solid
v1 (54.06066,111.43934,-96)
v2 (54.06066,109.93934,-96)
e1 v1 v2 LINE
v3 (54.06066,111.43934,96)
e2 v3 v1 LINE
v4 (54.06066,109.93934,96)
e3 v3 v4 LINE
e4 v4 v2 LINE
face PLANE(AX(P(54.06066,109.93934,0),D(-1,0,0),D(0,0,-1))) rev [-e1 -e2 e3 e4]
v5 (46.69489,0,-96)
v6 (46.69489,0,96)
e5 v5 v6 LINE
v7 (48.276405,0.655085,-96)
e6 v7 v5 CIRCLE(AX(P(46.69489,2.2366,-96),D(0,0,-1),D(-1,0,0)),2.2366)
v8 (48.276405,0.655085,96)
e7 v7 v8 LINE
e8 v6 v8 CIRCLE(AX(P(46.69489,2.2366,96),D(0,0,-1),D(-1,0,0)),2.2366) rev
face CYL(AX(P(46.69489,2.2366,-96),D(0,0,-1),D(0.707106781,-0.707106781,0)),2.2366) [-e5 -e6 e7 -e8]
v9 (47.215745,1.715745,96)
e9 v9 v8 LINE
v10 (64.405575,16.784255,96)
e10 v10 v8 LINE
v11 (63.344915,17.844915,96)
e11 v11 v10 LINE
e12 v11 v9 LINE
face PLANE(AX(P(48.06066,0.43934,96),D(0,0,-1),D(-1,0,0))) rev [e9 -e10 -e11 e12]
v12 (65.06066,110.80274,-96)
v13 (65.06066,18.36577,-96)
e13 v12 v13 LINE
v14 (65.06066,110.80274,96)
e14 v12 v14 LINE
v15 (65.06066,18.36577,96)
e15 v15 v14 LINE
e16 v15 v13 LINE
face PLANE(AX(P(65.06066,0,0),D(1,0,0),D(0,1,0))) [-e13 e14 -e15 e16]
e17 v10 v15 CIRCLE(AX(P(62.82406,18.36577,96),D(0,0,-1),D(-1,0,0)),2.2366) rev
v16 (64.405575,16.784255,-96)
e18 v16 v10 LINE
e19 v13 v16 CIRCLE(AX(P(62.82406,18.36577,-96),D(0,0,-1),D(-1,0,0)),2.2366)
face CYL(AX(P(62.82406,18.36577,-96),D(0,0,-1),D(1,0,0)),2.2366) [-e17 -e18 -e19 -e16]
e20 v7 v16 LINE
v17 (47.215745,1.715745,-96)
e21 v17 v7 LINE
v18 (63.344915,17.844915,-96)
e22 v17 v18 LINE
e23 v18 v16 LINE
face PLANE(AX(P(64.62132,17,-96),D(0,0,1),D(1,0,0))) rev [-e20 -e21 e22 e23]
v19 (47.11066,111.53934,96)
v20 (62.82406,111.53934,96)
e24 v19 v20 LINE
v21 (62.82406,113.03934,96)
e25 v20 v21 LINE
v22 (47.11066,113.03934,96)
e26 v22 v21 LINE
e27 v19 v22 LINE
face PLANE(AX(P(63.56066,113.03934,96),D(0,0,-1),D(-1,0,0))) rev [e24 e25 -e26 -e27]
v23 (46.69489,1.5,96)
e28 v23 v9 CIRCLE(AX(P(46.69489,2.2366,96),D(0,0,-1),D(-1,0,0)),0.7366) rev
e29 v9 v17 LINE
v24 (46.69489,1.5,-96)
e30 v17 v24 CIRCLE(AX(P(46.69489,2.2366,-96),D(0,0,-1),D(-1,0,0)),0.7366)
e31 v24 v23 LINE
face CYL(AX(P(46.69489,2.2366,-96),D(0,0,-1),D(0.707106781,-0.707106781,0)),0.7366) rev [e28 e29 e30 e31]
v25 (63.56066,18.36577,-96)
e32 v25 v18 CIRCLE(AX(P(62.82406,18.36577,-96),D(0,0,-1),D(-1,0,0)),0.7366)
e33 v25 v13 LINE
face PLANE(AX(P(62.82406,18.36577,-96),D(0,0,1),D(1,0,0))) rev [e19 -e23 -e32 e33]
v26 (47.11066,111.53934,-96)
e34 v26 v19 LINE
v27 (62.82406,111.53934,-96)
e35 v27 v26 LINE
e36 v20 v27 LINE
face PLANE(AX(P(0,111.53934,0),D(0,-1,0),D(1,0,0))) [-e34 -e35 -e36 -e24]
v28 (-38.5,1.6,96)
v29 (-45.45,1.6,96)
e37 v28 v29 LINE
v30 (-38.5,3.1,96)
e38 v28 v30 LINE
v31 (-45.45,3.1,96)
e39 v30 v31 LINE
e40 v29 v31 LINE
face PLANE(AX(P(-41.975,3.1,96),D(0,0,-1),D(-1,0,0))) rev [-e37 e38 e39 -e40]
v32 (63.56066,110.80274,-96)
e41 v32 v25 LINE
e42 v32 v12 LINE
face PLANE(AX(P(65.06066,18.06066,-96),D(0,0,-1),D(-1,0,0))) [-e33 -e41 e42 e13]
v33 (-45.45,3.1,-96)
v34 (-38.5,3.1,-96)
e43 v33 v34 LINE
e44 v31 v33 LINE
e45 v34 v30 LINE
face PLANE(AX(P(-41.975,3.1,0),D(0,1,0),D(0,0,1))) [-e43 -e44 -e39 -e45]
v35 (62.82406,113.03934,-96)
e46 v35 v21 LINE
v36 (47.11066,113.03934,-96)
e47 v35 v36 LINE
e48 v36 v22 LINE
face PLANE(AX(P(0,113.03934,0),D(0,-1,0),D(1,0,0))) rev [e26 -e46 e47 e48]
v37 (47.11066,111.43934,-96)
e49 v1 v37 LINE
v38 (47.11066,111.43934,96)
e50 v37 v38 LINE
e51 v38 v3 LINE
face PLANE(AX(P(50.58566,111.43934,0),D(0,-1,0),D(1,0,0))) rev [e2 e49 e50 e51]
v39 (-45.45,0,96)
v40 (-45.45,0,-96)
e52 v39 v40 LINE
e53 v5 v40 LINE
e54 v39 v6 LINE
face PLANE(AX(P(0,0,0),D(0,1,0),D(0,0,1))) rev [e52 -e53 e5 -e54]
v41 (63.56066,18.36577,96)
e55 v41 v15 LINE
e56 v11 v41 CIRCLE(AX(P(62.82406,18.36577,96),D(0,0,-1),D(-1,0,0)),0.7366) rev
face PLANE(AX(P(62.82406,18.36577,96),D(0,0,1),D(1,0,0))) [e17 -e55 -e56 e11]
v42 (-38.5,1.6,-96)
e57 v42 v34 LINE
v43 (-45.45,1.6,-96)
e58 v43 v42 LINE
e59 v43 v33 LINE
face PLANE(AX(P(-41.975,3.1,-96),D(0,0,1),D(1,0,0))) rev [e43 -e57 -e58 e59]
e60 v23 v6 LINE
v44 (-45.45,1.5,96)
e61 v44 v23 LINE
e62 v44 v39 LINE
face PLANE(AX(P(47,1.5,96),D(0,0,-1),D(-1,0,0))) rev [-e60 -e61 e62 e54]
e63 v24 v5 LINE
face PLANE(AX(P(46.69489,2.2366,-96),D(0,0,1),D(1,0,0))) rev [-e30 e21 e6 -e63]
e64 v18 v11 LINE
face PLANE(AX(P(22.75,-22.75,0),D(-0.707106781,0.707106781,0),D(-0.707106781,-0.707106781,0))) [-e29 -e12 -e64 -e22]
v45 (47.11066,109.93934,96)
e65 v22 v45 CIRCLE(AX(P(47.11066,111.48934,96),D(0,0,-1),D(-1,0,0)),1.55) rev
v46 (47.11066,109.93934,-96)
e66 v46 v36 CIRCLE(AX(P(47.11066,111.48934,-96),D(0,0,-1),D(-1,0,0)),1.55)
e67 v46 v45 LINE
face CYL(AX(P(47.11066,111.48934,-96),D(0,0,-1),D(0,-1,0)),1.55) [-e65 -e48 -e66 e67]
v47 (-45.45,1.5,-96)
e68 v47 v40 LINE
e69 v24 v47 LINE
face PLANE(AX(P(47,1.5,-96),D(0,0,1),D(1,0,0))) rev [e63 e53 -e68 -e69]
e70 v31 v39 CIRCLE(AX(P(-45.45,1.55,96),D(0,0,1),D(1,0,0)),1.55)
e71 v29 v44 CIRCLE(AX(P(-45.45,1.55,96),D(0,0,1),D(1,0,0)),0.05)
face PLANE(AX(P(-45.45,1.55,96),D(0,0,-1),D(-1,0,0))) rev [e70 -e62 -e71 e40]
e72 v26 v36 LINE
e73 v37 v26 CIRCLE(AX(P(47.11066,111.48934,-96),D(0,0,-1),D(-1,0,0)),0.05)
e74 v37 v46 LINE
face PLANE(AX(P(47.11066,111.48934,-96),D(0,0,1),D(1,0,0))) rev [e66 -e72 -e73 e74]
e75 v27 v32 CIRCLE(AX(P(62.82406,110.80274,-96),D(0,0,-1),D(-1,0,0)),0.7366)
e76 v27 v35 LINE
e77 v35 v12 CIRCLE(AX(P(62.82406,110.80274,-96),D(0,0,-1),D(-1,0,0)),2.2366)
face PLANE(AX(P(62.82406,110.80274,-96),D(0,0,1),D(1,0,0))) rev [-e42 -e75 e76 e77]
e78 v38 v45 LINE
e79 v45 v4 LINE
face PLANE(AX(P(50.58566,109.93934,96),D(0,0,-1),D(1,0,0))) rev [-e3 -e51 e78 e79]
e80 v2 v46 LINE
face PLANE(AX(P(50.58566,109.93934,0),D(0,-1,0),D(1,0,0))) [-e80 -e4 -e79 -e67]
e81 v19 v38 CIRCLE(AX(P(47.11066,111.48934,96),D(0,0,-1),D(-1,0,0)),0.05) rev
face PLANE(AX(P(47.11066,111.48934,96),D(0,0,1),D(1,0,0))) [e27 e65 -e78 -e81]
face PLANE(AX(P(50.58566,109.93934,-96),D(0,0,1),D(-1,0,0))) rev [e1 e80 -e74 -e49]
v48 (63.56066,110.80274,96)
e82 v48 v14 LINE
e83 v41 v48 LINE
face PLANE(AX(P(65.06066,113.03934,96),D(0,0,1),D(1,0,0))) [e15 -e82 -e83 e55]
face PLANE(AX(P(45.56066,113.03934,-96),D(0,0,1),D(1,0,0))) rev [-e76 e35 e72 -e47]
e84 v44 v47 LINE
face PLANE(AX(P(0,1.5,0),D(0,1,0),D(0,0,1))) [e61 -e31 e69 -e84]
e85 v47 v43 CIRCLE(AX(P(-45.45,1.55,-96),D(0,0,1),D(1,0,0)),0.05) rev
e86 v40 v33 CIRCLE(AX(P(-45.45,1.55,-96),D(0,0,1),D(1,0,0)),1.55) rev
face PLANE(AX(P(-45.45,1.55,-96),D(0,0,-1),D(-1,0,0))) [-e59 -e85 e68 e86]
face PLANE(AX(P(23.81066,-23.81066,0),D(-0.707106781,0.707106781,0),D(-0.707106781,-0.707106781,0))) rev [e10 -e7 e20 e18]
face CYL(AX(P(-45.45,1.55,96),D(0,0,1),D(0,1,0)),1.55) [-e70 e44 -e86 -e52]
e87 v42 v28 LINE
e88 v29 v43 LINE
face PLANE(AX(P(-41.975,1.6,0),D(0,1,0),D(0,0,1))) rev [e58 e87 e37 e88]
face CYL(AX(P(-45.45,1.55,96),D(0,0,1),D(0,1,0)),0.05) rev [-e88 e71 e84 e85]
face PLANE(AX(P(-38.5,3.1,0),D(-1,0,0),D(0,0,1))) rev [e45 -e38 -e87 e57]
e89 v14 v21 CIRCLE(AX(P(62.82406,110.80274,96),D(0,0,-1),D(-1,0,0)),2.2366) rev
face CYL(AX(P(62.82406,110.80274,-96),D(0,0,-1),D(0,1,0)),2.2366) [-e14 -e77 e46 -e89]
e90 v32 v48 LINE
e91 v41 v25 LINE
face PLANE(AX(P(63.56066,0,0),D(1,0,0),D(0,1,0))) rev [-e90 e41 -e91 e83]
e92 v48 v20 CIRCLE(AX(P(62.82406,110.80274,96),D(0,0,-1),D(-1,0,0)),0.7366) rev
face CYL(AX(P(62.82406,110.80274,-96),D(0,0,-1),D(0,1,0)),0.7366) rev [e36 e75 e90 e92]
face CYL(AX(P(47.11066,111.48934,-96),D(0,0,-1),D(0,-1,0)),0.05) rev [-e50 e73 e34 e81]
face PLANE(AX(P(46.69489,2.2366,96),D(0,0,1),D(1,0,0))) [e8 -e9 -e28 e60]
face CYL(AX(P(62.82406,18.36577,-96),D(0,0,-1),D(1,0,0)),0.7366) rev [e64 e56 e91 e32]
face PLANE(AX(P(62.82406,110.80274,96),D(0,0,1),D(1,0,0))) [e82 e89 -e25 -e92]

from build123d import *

# Parameters (mm, degrees)
CROQUIS1_W                       = 94
CROQUIS1_H                       = 192
BRIDA_BASE1_DEPTH                = 1.5
BRIDA_DE_ARISTA1_STRIP_CUT_DEPTH = 192
BRIDA_DE_ARISTA1_DEPTH           = 192
BRIDA_DE_ARISTA3_STRIP_CUT_DEPTH = 192
BRIDA_DE_ARISTA3_DEPTH           = 192
BRIDA_DE_ARISTA4_STRIP_W         = 7.4732
BRIDA_DE_ARISTA4_STRIP_H         = 1.5
BRIDA_DE_ARISTA4_STRIP_CUT_DEPTH = 192
BRIDA_DE_ARISTA4_DEPTH           = 192
DOBLADILLO1_START                = -96
DOBLADILLO1_DEPTH                = 192
DOBLADILLO1_2_DEPTH              = 192


# Read off the part's stored shape, not the designer's step: Dobladillo1
# Sheet-metal steps are written as plain solids
with BuildPart() as part:
    # Croquis1 → Brida base1 (new body)
    with BuildSketch(Plane(origin=(0, 0, 0), x_dir=(1, 0, 0), z_dir=(0, 1, 0))):
        Rectangle(CROQUIS1_W, CROQUIS1_H)
    extrude(amount=BRIDA_BASE1_DEPTH)

    # Brida de arista1 strip (across the edge) → Brida de arista1 strip cut (cut)
    with BuildSketch(Plane(origin=(47, 1.5, 96), x_dir=(-0.7071067811865438, 0.7071067811865512, 0), z_dir=(0, 0, -1))):
        Polygon((-6.129265424, 4.00794508), (-0.844915027, -1.276405317), (0.215745145, -0.215745145), (-5.068605252, 5.068605252), align=None)
    extrude(amount=BRIDA_DE_ARISTA1_STRIP_CUT_DEPTH, mode=Mode.SUBTRACT)

    # Brida de arista1 section (across the edge) → Brida de arista1 (add)
    with BuildSketch(Plane(origin=(47, 1.5, 96), x_dir=(-0.7071067811865438, 0.7071067811865512, 0), z_dir=(0, 0, -1))):
        with BuildLine():
            Line((-1.5, 0.30510971), (-1.5, 23.420310217))
            Line((-1.5, 23.420310217), (0, 23.420310217))
            Line((0, 23.420310217), (0, 0.30510971))
            ThreePointArc((0, 0.30510971), (0.056070336, 0.023225094), (0.215745145, -0.215745145))
            Line((0.215745145, -0.215745145), (-0.844915027, -1.276405317))
            ThreePointArc((-0.844915027, -1.276405317), (-1.329748962, -0.550800055), (-1.5, 0.30510971))
        make_face()
    extrude(amount=BRIDA_DE_ARISTA1_DEPTH)

    # Brida de arista3 strip (across the edge) → Brida de arista3 strip cut (cut)
    with BuildSketch(Plane(origin=(63.560660172, 18.060660172, 96), x_dir=(-1, 0, 0), z_dir=(0, 0, -1))):
        Polygon((-6.129265424, 4.00794508), (-0.844915027, -1.276405317), (0.215745145, -0.215745145), (-5.068605252, 5.068605252), align=None)
    extrude(amount=BRIDA_DE_ARISTA3_STRIP_CUT_DEPTH, mode=Mode.SUBTRACT)

    # Brida de arista3 section (across the edge) → Brida de arista3 (add)
    with BuildSketch(Plane(origin=(63.560660172, 18.060660172, 96), x_dir=(-1, 0, 0), z_dir=(0, 0, -1))):
        with BuildLine():
            Line((-1.5, 0.30510971), (-1.5, 94.978679656))
            Line((-1.5, 94.978679656), (0, 94.978679656))
            Line((0, 94.978679656), (0, 0.30510971))
            ThreePointArc((0, 0.30510971), (0.056070336, 0.023225094), (0.215745145, -0.215745145))
            Line((0.215745145, -0.215745145), (-0.844915027, -1.276405317))
            ThreePointArc((-0.844915027, -1.276405317), (-1.329748962, -0.550800055), (-1.5, 0.30510971))
        make_face()
    extrude(amount=BRIDA_DE_ARISTA3_DEPTH)

    # Brida de arista4 strip (across the edge) → Brida de arista4 strip cut (cut)
    with BuildSketch(Plane(origin=(63.560660172, 113.039339828, 96), x_dir=(0, -1, 0), z_dir=(0, 0, -1))):
        with Locations((-1.5, -0.75)):
            Rectangle(BRIDA_DE_ARISTA4_STRIP_W, BRIDA_DE_ARISTA4_STRIP_H)
    extrude(amount=BRIDA_DE_ARISTA4_STRIP_CUT_DEPTH, mode=Mode.SUBTRACT)

    # Brida de arista4 section (across the edge) → Brida de arista4 (add)
    with BuildSketch(Plane(origin=(63.560660172, 113.039339828, 96), x_dir=(0, -1, 0), z_dir=(0, 0, -1))):
        with BuildLine():
            Line((0, 0.7366), (0, 18))
            Line((0, 18), (1.5, 18))
            Line((1.5, 18), (1.5, 0.7366))
            ThreePointArc((1.5, 0.7366), (1.715745145, 0.215745145), (2.2366, 0))
            Line((2.2366, 0), (2.2366, -1.5))
            ThreePointArc((2.2366, -1.5), (0.655084973, -0.844915027), (0, 0.7366))
        make_face()
    extrude(amount=BRIDA_DE_ARISTA4_DEPTH)

    # Dobladillo1 outline → Dobladillo1 (cut)
    with BuildSketch(Plane.XY.offset(DOBLADILLO1_START)):
        with BuildLine():
            Line((45.560660172, 111.539339828), (45.561466834, 111.539339828))
            ThreePointArc((45.561466834, 111.539339828), (46.032467239, 112.602892701), (47.110660172, 113.039339828))
            Line((47.110660172, 113.039339828), (45.560660172, 113.039339828))
            Line((45.560660172, 113.039339828), (45.560660172, 111.539339828))
        make_face()
        with BuildLine():
            ThreePointArc((-45.45, 0), (-46.528192933, 0.436447127), (-46.999193338, 1.5))
            Line((-46.999193338, 1.5), (-47, 1.5))
            Line((-47, 1.5), (-47, 0))
            Line((-47, 0), (-45.45, 0))
        make_face()
    extrude(amount=DOBLADILLO1_DEPTH, mode=Mode.SUBTRACT)

    # Dobladillo1 2 outline → Dobladillo1 2 (add)
    with BuildSketch(Plane.XY.offset(DOBLADILLO1_START)):
        with BuildLine():
            Line((54.060660172, 109.939339828), (54.060660172, 111.439339828))
            Line((54.060660172, 111.439339828), (47.110660172, 111.439339828))
            ThreePointArc((47.110660172, 111.439339828), (47.060660172, 111.489339828), (47.110660172, 111.539339828))
            Line((47.110660172, 111.539339828), (45.561466834, 111.539339828))
            ThreePointArc((45.561466834, 111.539339828), (45.997107299, 110.411146895), (47.110660172, 109.939339828))
            Line((47.110660172, 109.939339828), (54.060660172, 109.939339828))
        make_face()
        with BuildLine():
            Line((-38.5, 1.6), (-38.5, 3.1))
            Line((-38.5, 3.1), (-45.45, 3.1))
            ThreePointArc((-45.45, 3.1), (-46.563552873, 2.628192933), (-46.999193338, 1.5))
            Line((-46.999193338, 1.5), (-45.45, 1.5))
            ThreePointArc((-45.45, 1.5), (-45.5, 1.55), (-45.45, 1.6))
            Line((-45.45, 1.6), (-38.5, 1.6))
        make_face()
    extrude(amount=DOBLADILLO1_2_DEPTH)


solid = part.part
